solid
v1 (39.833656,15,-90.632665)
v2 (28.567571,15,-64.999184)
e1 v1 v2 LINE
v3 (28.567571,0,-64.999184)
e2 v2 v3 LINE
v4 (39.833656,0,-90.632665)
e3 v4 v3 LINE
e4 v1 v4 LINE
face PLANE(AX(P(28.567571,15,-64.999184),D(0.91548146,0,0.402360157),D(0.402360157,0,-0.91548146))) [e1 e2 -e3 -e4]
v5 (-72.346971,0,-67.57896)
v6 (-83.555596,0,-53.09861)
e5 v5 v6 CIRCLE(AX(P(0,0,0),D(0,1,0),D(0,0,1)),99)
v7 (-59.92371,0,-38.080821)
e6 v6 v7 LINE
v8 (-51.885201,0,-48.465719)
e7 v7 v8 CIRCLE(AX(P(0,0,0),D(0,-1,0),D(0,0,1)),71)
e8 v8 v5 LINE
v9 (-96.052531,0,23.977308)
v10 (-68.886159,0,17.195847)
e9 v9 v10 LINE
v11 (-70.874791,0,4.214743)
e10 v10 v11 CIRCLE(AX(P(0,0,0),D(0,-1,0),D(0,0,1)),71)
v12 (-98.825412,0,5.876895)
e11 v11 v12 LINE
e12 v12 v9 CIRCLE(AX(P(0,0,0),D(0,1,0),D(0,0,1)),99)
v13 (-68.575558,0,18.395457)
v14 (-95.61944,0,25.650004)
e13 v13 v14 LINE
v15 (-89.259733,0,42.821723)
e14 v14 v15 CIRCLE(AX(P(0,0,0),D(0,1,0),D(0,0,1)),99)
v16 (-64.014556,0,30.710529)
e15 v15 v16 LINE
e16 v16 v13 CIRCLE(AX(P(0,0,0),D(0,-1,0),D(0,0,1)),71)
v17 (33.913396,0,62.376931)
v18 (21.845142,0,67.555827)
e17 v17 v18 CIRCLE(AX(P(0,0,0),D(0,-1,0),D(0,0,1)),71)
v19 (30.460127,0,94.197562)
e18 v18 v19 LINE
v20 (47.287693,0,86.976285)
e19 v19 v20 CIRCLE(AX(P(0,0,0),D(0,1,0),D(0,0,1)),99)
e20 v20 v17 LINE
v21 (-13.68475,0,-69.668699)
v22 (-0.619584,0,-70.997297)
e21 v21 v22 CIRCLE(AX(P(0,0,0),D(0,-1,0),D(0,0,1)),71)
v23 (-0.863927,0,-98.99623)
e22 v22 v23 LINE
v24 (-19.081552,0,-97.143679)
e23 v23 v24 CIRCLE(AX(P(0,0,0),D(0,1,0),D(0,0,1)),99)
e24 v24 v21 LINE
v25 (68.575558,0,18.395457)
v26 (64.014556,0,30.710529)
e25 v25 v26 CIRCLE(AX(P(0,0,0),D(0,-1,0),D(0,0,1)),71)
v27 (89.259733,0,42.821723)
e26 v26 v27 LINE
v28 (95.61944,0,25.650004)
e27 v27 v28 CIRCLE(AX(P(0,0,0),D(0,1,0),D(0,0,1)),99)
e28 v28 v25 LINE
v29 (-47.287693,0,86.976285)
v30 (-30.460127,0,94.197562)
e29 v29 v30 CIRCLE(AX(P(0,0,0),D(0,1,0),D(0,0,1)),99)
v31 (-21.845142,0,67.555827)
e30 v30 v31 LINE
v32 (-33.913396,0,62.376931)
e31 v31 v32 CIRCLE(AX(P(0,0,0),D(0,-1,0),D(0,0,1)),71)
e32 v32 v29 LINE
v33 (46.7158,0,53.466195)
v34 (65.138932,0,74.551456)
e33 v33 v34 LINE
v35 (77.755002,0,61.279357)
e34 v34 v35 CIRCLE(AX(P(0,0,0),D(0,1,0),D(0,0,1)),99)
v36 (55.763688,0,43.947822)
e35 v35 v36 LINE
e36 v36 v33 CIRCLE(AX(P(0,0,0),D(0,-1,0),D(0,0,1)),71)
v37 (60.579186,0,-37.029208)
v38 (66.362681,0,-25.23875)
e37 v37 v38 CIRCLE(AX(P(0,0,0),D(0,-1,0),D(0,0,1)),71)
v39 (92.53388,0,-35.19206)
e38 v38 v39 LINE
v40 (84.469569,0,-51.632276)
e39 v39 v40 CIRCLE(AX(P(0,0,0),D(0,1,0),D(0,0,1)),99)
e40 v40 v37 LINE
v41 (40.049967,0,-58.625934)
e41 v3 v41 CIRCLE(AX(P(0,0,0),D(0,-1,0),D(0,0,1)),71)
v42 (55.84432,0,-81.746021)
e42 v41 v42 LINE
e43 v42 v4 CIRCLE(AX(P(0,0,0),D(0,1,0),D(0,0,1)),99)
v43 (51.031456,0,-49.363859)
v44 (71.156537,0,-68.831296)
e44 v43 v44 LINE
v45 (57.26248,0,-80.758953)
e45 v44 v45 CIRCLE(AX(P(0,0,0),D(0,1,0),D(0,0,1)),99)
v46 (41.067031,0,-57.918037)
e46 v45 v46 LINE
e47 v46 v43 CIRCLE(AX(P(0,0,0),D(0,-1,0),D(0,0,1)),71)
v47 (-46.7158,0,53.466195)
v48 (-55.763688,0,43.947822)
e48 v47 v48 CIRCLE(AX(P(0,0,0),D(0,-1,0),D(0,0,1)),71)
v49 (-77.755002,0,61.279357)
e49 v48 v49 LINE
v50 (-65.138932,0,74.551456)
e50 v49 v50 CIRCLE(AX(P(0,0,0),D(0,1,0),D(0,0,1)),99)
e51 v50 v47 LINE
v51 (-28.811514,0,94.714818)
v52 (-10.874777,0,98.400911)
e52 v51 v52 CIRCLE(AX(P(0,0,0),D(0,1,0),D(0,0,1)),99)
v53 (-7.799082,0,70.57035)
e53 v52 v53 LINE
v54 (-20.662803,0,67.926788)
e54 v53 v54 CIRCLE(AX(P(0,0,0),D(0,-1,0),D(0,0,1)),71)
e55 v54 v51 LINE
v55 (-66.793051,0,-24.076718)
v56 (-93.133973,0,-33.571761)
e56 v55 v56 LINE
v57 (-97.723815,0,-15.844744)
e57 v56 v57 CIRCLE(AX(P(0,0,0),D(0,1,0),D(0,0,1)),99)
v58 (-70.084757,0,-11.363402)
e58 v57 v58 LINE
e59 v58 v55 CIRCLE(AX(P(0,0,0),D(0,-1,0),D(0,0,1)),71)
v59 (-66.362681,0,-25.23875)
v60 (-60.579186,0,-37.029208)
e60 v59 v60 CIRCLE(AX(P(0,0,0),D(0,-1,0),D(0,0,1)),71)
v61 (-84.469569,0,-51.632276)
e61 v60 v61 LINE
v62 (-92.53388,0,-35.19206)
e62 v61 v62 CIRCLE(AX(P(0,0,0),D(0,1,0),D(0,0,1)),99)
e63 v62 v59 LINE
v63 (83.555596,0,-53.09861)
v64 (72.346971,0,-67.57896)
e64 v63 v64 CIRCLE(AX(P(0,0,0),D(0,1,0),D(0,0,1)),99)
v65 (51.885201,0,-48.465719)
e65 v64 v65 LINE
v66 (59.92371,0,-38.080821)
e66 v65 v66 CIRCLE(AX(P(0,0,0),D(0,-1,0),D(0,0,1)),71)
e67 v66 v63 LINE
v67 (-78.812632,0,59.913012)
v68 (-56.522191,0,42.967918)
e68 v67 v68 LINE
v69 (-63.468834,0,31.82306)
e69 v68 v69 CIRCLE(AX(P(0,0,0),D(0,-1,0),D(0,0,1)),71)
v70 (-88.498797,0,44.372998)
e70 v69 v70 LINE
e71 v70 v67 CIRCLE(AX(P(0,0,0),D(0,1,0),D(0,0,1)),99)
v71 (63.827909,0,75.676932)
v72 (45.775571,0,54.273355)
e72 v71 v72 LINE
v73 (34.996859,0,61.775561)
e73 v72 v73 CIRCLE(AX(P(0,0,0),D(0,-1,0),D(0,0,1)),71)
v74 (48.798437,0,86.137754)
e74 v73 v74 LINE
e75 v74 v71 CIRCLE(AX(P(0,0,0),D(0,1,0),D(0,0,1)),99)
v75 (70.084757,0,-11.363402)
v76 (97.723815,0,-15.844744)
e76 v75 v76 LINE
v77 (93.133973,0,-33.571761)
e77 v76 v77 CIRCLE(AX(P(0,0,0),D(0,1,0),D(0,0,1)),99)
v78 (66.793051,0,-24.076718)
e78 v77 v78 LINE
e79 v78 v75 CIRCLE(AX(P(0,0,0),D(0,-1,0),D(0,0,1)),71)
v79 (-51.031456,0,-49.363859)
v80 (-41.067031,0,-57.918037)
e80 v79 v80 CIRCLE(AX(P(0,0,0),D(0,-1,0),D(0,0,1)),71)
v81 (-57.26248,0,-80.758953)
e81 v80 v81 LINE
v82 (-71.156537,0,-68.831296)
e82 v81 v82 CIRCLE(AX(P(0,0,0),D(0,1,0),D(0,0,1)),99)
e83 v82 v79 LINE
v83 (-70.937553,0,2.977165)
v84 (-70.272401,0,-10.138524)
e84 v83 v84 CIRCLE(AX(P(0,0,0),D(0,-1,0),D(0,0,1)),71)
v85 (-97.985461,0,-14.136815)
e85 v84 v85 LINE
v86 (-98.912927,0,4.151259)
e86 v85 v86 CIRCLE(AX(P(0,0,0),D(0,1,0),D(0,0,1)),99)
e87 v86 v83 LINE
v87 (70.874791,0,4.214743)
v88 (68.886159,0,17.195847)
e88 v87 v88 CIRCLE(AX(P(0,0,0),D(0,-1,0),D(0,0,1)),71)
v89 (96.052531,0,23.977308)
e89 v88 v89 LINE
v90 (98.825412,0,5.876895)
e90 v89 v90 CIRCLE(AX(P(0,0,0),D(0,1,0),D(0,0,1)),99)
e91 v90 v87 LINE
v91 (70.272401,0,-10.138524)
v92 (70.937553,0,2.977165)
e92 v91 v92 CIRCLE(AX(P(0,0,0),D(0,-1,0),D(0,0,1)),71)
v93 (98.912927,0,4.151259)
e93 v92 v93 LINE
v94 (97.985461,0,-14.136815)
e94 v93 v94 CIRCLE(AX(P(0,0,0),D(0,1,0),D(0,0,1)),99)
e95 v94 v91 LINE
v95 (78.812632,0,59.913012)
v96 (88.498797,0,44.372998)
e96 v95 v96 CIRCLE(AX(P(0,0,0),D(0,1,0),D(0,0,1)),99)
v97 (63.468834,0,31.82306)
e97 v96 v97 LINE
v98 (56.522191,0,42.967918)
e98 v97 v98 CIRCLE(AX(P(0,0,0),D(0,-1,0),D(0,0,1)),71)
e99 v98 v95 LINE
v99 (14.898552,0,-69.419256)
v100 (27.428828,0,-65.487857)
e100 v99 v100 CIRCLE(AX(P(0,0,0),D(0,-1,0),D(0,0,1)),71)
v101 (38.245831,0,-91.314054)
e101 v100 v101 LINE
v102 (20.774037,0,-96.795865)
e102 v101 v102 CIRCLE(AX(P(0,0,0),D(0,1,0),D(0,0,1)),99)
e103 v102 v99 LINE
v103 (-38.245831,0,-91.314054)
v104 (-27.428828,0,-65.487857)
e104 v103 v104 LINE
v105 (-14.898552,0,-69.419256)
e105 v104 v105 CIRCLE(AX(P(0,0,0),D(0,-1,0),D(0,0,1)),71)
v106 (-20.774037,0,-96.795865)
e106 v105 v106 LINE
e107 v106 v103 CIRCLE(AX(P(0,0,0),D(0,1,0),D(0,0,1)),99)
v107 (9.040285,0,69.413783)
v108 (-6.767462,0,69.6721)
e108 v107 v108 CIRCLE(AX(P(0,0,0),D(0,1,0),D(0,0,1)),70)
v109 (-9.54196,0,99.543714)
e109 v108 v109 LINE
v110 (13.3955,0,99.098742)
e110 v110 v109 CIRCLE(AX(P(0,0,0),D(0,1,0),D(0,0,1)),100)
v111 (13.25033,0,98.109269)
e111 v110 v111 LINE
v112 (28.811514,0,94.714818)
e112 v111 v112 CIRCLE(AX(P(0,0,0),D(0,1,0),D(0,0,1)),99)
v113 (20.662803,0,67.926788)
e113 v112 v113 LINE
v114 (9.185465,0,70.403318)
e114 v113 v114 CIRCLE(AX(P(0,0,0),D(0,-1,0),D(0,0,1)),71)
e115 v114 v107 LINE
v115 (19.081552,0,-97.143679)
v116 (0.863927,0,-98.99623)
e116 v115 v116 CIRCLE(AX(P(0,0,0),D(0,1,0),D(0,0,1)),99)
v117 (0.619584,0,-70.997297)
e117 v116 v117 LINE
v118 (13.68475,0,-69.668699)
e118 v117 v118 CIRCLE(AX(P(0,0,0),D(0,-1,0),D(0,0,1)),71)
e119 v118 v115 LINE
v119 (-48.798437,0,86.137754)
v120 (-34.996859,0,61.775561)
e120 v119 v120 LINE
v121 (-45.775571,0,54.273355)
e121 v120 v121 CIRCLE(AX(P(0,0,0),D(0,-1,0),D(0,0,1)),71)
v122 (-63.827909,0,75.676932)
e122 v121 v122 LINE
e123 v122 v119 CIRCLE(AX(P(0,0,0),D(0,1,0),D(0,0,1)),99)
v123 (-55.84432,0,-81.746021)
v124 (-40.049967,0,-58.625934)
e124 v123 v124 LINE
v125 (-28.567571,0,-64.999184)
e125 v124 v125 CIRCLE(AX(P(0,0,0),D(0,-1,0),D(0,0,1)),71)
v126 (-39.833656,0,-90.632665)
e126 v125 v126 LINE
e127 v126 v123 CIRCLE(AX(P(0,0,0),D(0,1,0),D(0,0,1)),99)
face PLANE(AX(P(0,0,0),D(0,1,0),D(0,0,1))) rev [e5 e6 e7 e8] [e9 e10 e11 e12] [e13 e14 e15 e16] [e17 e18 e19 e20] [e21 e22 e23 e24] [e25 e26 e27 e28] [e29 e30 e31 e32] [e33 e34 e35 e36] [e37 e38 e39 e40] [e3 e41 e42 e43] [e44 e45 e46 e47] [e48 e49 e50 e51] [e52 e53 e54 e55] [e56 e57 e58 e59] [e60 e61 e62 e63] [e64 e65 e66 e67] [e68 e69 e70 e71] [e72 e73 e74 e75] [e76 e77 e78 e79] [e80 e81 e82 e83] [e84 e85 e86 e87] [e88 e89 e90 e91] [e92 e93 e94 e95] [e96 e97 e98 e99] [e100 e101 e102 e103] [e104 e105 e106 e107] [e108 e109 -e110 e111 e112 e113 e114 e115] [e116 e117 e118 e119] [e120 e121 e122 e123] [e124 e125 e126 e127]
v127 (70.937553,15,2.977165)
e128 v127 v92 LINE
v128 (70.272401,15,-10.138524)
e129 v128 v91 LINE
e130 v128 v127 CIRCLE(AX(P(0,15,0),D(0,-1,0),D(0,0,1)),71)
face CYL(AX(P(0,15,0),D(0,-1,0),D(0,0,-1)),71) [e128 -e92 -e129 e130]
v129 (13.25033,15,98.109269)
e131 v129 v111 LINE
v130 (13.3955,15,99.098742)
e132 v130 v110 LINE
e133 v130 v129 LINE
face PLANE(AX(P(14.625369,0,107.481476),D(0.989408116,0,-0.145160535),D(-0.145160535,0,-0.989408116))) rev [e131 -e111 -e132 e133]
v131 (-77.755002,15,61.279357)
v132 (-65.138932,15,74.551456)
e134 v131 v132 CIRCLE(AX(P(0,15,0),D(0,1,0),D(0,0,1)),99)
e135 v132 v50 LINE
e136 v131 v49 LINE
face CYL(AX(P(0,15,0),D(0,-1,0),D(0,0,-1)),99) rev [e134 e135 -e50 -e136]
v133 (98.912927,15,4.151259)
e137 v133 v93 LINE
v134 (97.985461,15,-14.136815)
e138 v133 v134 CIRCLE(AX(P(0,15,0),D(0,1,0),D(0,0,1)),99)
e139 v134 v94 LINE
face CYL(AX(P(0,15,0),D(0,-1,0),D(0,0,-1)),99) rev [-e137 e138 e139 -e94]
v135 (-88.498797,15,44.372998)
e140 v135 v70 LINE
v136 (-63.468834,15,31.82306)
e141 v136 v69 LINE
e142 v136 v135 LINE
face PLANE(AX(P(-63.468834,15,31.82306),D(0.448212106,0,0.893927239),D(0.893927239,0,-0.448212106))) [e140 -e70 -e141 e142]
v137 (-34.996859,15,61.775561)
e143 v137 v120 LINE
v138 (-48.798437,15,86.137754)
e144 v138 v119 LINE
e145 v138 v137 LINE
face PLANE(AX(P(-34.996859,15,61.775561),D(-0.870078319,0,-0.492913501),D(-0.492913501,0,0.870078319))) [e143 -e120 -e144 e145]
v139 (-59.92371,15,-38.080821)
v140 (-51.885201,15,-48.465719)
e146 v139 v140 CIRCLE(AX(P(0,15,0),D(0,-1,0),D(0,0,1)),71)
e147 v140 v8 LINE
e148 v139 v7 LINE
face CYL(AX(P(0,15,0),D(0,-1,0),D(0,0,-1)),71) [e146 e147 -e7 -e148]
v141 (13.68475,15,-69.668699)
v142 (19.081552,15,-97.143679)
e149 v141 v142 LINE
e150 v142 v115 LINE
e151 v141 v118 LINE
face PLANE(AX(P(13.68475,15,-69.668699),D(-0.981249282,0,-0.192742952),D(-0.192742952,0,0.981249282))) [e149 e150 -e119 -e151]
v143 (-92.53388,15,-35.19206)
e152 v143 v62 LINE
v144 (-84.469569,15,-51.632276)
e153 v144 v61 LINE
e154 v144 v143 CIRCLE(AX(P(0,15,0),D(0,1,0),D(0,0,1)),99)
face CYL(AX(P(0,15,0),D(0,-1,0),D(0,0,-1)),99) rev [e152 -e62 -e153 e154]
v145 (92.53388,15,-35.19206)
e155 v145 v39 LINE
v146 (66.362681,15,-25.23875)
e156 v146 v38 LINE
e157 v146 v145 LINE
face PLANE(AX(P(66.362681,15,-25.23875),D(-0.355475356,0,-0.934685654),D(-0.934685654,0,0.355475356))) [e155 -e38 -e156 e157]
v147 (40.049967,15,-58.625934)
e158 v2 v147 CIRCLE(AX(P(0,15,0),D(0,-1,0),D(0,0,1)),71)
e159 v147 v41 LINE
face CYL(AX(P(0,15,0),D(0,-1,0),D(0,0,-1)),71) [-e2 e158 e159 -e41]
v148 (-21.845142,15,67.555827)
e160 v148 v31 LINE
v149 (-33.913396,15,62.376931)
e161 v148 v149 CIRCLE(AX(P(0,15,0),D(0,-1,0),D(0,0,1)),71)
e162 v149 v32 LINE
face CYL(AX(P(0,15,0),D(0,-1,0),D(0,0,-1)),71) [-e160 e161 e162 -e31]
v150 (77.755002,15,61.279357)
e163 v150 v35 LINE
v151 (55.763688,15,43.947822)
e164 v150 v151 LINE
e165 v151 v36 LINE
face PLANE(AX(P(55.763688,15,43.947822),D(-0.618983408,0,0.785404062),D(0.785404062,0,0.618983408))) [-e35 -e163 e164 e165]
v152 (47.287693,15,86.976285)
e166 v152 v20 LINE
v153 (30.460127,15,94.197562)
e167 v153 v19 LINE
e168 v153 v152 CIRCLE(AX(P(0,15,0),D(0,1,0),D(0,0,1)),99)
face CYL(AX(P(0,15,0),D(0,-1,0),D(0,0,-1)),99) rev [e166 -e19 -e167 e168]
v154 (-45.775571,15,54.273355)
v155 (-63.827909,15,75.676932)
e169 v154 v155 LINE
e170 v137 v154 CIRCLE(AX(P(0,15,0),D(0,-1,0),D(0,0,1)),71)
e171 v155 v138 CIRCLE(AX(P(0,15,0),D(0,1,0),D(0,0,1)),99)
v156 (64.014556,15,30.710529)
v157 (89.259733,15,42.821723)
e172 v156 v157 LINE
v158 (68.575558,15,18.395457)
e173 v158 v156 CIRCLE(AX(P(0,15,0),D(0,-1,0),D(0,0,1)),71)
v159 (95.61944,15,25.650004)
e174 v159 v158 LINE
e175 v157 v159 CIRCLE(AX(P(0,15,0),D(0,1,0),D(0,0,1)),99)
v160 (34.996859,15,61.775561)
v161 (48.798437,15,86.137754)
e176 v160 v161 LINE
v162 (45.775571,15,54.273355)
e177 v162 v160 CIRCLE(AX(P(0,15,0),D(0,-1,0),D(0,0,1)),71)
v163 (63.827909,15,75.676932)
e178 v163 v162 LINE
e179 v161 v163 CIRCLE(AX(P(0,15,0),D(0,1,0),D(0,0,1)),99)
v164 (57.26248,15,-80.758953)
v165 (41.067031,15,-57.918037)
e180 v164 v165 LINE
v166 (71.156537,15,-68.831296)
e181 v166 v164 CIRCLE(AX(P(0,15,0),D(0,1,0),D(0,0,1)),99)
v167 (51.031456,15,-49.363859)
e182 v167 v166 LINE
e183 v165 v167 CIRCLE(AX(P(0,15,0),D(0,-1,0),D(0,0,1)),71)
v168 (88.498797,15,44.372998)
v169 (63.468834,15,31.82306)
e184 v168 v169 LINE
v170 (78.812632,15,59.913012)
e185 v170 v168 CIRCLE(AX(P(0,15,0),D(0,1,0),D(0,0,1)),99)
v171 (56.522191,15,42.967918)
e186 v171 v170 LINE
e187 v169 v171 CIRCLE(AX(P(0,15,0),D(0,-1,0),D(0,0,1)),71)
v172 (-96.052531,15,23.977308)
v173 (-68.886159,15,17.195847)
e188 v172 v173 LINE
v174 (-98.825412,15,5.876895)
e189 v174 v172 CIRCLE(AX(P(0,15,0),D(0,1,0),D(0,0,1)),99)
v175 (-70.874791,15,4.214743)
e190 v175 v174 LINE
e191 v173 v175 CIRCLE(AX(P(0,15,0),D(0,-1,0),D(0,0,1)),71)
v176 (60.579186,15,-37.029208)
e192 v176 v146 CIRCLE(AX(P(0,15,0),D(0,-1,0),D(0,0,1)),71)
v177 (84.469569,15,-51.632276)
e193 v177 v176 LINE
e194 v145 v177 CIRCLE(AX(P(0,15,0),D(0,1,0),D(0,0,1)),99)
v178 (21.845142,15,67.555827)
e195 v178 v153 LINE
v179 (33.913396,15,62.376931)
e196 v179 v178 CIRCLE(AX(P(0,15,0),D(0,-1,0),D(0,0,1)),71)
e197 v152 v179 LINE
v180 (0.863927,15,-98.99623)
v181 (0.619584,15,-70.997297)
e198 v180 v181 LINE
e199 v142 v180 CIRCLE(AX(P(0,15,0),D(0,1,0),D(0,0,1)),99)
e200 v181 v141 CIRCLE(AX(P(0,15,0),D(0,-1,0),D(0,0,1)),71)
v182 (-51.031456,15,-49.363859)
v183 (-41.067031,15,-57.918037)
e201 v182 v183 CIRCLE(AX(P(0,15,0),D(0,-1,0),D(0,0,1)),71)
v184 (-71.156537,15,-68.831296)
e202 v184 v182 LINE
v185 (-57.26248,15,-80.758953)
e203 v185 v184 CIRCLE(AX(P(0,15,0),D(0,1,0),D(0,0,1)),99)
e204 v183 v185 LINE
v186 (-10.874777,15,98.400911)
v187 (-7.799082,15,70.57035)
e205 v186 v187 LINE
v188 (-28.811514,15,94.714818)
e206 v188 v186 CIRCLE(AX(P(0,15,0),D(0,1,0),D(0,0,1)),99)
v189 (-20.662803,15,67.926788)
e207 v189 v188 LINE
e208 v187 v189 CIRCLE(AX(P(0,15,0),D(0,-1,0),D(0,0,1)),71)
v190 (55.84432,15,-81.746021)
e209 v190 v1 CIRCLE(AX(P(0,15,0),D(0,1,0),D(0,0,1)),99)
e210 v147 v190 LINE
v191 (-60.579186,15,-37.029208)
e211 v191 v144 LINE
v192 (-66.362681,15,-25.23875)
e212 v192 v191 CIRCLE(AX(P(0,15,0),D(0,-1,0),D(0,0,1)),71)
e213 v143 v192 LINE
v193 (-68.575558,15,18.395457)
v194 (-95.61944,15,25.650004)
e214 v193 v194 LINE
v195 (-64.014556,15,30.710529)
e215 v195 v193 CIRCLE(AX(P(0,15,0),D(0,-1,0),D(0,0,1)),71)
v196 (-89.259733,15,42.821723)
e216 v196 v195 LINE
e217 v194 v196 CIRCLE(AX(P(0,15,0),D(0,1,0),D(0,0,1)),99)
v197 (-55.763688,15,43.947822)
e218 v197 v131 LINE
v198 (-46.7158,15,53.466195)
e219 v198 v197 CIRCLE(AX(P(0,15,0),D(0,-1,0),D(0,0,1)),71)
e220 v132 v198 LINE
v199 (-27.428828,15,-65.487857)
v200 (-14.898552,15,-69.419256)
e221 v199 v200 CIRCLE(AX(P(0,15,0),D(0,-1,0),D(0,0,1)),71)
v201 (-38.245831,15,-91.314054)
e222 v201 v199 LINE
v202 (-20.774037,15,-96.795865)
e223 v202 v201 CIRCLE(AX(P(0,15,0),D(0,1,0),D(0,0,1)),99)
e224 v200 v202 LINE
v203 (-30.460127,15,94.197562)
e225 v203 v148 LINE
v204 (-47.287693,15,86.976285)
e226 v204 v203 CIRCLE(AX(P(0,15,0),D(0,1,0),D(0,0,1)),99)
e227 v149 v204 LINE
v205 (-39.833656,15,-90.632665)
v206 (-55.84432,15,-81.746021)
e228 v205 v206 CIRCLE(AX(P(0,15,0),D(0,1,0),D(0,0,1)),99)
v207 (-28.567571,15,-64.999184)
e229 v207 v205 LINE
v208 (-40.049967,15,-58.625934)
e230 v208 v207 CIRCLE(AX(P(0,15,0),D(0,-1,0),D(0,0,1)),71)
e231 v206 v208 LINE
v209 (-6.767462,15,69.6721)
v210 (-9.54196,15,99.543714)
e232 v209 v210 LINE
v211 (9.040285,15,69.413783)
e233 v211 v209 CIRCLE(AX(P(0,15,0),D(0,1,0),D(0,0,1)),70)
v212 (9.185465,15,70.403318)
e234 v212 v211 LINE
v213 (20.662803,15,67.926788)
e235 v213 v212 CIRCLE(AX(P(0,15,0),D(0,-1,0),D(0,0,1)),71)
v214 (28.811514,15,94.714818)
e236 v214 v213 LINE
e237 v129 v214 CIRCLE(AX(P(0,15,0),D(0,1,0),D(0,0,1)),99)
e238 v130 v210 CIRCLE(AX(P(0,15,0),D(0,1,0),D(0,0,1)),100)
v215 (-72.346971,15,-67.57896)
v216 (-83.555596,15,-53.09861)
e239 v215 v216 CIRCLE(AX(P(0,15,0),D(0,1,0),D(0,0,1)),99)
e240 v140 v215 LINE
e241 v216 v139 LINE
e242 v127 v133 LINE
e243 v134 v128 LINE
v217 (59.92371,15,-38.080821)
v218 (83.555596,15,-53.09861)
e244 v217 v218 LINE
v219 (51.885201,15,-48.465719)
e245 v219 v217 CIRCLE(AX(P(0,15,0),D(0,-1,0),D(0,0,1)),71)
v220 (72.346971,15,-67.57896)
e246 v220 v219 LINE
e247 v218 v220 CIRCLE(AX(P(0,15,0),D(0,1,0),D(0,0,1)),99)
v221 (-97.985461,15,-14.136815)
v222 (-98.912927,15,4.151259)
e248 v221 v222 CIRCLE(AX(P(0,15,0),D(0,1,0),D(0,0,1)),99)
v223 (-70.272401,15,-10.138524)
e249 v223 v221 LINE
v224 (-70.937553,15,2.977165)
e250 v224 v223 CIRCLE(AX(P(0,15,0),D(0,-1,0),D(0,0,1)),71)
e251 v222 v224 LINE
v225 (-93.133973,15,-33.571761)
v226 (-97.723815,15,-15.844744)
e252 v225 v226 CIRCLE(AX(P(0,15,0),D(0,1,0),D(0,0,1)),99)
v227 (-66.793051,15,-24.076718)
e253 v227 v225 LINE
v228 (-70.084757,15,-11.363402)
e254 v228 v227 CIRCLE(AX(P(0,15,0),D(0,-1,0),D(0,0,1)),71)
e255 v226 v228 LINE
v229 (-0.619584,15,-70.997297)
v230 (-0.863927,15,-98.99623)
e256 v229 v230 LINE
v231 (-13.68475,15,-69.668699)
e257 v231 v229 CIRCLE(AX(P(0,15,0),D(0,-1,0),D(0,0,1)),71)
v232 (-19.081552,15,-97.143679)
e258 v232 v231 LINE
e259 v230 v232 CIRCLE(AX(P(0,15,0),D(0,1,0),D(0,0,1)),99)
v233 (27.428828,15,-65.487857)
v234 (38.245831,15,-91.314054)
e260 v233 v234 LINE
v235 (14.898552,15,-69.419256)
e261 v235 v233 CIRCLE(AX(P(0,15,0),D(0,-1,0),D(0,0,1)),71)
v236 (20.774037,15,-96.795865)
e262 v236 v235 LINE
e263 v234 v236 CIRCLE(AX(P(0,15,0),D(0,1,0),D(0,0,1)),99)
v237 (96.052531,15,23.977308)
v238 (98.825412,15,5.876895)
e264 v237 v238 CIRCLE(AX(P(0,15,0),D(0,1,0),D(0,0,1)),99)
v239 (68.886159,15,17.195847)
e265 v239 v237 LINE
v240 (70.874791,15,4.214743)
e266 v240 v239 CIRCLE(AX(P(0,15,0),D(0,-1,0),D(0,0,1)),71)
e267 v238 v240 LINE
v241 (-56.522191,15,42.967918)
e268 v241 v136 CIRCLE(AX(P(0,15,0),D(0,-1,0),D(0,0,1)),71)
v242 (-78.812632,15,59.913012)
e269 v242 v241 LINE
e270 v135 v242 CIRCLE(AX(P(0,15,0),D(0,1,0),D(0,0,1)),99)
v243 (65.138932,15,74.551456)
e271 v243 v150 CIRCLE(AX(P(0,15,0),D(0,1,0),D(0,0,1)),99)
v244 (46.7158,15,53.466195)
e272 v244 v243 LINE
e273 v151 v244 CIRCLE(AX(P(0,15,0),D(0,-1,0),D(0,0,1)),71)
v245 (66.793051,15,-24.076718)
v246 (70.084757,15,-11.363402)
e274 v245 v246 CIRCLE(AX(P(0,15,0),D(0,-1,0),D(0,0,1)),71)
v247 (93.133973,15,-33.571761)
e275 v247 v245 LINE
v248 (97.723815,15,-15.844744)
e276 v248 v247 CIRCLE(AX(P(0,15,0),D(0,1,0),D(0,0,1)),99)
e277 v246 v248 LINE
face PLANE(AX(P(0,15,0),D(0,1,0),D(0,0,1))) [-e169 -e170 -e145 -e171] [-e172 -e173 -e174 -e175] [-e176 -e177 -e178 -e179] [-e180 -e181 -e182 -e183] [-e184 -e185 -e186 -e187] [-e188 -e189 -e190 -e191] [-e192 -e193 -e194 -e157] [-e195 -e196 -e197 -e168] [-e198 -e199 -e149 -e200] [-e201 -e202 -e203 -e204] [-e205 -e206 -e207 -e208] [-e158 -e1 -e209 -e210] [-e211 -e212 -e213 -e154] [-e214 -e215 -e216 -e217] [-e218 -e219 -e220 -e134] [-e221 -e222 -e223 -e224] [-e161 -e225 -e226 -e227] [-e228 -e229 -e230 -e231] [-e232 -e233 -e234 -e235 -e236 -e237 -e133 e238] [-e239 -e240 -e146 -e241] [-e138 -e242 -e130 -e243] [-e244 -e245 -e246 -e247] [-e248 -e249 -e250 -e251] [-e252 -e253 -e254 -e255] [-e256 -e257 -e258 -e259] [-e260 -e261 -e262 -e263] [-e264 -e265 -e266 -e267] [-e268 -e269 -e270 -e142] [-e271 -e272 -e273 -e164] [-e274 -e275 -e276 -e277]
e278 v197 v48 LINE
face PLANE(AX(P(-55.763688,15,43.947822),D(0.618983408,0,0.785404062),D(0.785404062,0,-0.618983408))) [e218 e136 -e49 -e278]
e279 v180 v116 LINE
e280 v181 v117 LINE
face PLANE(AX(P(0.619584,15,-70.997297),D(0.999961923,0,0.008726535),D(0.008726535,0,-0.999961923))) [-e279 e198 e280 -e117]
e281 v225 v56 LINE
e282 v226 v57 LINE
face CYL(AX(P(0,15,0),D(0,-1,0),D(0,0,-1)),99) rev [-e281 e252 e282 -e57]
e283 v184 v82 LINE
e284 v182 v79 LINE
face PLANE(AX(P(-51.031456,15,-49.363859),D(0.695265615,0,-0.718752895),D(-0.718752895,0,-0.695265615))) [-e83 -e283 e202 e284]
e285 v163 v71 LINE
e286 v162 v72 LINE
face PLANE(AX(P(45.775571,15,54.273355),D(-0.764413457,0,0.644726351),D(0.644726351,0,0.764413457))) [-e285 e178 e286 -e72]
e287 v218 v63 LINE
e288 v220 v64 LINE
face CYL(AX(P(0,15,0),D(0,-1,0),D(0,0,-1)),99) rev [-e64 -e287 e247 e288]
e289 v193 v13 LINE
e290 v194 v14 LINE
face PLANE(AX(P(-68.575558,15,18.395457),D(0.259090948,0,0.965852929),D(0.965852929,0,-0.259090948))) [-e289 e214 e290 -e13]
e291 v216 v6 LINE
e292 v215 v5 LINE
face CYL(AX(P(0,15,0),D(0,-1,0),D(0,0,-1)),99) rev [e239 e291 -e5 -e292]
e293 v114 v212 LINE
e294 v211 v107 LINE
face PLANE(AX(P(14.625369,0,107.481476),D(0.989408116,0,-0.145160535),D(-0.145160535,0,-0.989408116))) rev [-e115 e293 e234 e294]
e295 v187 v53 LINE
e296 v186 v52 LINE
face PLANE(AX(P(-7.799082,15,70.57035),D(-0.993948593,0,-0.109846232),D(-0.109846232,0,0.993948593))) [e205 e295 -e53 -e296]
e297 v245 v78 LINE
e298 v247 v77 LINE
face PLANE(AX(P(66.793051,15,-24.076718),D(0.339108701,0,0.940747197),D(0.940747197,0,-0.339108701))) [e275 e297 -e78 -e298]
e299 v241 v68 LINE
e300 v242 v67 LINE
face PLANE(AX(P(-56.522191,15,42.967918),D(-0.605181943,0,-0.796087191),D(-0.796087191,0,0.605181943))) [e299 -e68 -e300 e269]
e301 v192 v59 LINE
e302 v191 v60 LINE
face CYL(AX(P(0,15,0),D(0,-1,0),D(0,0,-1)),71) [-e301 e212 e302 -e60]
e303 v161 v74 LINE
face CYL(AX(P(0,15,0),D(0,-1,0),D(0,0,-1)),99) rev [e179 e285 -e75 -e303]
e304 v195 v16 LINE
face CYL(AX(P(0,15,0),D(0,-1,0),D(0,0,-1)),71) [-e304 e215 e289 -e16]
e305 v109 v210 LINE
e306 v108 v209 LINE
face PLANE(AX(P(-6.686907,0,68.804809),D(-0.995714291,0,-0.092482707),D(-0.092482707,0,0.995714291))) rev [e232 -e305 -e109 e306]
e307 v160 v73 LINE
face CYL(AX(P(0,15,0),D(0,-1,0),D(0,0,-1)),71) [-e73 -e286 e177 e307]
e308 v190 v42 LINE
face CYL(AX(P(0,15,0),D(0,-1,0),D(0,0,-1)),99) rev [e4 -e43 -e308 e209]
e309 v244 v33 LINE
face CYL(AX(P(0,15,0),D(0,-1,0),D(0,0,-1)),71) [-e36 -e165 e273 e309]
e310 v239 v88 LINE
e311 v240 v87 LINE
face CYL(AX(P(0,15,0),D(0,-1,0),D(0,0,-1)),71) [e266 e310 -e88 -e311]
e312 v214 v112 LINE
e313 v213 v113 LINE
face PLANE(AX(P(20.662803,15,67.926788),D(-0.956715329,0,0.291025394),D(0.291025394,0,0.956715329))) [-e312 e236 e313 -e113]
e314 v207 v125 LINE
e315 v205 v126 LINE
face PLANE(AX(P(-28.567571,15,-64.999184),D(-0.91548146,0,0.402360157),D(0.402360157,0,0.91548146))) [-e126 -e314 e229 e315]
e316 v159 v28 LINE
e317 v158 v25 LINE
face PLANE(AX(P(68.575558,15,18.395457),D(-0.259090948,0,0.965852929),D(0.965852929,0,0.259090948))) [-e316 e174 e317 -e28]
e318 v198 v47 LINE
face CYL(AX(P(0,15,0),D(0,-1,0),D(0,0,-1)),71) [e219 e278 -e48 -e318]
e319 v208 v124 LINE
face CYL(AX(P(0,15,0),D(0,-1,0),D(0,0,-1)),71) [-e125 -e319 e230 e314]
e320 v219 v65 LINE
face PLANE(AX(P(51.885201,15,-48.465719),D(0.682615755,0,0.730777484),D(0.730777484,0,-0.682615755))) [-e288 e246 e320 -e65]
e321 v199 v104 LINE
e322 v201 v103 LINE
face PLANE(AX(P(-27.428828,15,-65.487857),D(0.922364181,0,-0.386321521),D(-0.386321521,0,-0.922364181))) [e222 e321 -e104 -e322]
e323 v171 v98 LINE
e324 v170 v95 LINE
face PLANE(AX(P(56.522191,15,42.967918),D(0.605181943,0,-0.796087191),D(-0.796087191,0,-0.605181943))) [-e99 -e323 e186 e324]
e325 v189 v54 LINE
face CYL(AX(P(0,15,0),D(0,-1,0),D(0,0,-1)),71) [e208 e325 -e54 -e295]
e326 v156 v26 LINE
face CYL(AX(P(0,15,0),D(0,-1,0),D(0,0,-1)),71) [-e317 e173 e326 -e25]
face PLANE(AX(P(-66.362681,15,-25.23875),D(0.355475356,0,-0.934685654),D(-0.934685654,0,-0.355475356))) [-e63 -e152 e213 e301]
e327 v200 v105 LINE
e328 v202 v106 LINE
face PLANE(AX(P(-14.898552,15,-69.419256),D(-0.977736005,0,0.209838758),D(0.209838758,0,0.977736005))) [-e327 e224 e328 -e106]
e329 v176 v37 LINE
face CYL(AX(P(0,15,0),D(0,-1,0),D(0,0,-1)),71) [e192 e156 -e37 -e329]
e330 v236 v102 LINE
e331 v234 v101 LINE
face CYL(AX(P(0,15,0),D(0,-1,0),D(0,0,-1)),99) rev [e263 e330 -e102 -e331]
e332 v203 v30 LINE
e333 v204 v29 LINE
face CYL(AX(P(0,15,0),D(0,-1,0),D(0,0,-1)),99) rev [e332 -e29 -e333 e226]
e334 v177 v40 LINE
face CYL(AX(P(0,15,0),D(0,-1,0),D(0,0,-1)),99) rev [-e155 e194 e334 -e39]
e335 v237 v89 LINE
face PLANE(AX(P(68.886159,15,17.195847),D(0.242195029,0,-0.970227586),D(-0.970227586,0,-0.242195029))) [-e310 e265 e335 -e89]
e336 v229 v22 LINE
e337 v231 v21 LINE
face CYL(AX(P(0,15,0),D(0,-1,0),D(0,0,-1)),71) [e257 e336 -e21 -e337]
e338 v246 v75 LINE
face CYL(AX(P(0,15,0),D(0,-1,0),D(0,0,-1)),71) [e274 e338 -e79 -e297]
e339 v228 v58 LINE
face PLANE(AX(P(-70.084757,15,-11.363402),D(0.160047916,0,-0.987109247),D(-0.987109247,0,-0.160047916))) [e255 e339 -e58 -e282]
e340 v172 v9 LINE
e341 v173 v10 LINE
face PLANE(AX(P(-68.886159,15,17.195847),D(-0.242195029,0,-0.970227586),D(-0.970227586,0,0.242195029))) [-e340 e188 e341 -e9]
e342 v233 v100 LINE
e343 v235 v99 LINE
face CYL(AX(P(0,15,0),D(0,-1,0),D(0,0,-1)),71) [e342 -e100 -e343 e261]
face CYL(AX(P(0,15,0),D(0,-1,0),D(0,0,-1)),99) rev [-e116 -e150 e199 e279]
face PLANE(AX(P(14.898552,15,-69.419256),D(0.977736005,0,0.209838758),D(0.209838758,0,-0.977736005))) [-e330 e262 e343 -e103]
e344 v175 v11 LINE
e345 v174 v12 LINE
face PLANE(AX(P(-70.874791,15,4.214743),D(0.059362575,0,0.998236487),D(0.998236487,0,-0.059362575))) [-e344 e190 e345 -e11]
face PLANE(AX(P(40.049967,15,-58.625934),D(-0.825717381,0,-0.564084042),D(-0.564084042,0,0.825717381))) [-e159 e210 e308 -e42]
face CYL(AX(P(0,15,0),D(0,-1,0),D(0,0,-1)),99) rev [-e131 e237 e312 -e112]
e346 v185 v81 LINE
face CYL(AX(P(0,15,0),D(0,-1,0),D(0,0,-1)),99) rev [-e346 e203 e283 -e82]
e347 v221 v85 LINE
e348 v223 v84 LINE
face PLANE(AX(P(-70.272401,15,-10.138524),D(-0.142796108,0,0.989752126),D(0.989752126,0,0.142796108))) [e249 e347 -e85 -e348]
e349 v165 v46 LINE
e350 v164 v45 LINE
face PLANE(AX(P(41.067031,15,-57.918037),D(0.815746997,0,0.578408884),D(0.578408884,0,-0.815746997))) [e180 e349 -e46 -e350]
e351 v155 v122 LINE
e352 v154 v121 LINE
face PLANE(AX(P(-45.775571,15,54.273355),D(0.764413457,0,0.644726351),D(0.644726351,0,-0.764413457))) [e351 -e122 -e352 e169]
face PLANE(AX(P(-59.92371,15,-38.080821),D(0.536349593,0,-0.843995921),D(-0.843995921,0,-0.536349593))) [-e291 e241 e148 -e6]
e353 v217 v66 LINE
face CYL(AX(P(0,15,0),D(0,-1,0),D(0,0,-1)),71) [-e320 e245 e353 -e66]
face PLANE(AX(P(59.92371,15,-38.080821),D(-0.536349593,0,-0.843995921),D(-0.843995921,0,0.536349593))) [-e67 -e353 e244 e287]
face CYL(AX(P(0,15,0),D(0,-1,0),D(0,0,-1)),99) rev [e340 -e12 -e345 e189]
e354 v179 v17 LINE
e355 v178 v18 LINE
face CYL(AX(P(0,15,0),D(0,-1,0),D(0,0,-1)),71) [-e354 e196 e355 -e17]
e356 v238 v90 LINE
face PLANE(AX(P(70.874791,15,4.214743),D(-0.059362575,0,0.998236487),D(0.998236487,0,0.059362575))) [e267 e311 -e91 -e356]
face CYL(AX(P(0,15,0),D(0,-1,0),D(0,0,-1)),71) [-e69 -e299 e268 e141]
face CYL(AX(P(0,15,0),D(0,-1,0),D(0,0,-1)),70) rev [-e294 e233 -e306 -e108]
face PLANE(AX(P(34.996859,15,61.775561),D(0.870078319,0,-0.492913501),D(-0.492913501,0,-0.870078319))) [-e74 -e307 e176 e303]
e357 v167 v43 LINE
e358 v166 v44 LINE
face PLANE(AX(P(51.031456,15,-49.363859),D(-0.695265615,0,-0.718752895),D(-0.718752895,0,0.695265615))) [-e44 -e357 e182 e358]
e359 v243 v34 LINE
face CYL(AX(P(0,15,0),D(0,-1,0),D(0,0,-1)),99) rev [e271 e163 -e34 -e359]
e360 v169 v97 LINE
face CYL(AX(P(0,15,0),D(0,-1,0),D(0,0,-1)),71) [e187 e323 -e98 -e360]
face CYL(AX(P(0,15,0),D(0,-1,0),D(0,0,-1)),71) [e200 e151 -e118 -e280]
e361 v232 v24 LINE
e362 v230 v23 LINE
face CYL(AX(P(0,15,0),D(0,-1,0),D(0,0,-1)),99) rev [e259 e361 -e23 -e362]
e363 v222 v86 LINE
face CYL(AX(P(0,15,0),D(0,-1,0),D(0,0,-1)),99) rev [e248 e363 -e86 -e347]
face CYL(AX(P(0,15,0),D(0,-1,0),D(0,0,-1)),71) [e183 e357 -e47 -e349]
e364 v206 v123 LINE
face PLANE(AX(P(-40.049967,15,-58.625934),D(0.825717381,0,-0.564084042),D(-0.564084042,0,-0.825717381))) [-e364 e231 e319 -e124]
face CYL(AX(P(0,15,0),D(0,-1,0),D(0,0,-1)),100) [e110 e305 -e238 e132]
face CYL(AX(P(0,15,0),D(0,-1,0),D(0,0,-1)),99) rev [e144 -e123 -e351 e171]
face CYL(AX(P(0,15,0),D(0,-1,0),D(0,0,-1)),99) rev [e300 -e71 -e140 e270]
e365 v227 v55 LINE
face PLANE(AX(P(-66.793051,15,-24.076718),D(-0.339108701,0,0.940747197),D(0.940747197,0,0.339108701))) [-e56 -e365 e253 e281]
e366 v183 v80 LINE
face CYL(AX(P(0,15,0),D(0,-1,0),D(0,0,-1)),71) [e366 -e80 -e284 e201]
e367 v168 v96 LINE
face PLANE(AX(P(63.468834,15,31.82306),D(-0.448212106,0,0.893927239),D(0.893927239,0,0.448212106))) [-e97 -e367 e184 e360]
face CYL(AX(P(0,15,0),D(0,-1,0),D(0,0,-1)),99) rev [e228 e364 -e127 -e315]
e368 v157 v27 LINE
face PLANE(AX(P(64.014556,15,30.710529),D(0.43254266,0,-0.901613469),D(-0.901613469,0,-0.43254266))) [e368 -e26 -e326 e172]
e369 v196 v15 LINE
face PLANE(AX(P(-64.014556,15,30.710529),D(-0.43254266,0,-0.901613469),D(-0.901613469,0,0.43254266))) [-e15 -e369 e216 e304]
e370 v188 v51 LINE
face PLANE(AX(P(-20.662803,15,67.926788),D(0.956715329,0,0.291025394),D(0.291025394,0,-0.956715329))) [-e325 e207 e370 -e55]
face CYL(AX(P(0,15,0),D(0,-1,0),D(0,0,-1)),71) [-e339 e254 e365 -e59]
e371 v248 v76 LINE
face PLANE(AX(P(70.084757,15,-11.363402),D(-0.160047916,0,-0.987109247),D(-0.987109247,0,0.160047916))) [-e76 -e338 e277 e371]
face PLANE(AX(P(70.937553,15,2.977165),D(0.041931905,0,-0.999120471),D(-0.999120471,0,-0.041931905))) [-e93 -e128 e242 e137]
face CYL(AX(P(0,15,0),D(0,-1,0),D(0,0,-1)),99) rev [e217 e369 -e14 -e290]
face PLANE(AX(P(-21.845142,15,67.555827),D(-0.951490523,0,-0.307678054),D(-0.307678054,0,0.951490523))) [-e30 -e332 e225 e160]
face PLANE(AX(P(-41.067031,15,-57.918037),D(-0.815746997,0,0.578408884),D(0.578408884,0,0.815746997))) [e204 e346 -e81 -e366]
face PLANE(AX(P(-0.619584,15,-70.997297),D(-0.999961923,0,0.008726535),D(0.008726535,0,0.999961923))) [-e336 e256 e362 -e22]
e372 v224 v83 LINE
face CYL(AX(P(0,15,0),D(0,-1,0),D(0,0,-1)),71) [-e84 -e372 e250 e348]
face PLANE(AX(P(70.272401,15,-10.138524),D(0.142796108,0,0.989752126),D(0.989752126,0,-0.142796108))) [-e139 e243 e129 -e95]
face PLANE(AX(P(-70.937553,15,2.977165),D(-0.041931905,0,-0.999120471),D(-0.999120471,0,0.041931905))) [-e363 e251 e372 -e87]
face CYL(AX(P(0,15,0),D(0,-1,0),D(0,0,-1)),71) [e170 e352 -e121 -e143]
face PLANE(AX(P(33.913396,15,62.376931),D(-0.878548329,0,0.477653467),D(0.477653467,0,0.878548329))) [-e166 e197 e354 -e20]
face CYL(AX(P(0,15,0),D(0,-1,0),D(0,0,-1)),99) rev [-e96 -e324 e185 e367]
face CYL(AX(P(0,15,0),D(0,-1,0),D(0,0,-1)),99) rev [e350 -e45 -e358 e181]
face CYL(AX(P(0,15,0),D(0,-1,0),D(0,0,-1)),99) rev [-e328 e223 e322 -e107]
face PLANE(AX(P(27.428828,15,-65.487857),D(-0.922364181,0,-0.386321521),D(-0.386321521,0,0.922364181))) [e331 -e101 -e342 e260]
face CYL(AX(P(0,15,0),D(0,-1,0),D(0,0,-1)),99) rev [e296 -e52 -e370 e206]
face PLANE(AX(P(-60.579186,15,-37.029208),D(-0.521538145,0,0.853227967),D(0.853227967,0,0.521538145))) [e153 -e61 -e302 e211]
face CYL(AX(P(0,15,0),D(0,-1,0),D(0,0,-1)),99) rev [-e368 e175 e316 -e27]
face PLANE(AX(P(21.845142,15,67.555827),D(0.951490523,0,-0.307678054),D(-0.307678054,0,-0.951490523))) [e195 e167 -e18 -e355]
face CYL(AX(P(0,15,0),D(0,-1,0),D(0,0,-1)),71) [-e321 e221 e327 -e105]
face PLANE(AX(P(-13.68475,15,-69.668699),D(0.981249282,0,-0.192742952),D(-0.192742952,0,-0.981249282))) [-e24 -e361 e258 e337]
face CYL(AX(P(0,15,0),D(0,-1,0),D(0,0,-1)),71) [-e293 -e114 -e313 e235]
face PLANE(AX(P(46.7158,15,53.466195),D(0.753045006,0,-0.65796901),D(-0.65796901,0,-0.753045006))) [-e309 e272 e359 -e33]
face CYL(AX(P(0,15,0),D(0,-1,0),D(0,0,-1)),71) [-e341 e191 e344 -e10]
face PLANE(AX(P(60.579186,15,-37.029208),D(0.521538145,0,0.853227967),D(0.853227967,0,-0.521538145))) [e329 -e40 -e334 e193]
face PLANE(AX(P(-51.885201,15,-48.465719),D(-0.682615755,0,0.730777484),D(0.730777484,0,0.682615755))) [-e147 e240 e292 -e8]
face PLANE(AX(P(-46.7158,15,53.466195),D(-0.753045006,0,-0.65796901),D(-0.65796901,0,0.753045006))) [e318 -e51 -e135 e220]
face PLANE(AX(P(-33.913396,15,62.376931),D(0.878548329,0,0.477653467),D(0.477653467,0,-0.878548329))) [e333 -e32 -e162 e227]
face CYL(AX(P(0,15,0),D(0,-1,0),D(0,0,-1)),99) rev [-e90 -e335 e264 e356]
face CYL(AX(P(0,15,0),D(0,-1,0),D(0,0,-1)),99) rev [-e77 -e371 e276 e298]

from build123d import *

# Parameters (mm, degrees)
RESSALTO_EXTRUS_O1_OUTLINE_R   = 100
RESSALTO_EXTRUS_O1_OUTLINE_R_2 = 70
RESSALTO_EXTRUS_O1_DEPTH       = 15
CORTE_EXTRUS_O1_DEPTH          = 143.214626533


# Read off the part's stored shape, not the designer's step: Ressalto-extrusão1
with BuildPart() as part:
    # Ressalto-extrusão1 outline → Ressalto-extrusão1 (new body)
    with BuildSketch(Plane(origin=(0, 0, 0), x_dir=(1, 0, 0), z_dir=(0, 1, 0))):
        Circle(RESSALTO_EXTRUS_O1_OUTLINE_R)
        with BuildLine():
            Line((-46.71579972, -53.466195456), (-65.138932004, -74.551455635))
            ThreePointArc((-65.138932004, -74.551455635), (-71.754485936, -68.207724989), (-77.755002141, -61.279357389))
            Line((-77.755002141, -61.279357389), (-55.763688404, -43.947821966))
            ThreePointArc((-55.763688404, -43.947821966), (-51.460287893, -48.916651255), (-46.71579972, -53.466195456))
        make_face(mode=Mode.SUBTRACT)
        with BuildLine():
            Line((-21.845141851, -67.555827117), (-30.460127369, -94.197561755))
            ThreePointArc((-30.460127369, -94.197561755), (-39.041229656, -90.97682335), (-47.287693227, -86.976284522))
            Line((-47.287693227, -86.976284522), (-33.913396152, -62.376931324))
            ThreePointArc((-33.913396152, -62.376931324), (-27.999265713, -65.246004625), (-21.845141851, -67.555827117))
        make_face(mode=Mode.SUBTRACT)
        with BuildLine():
            Line((-7.799082491, -70.570350093), (-10.874776995, -98.400910693))
            ThreePointArc((-10.874776995, -98.400910693), (-19.928553489, -96.973464184), (-28.811514011, -94.714817533))
            Line((-28.811514011, -94.714817533), (-20.662802978, -67.926788332))
            ThreePointArc((-20.662802978, -67.926788332), (-14.292194926, -69.546625829), (-7.799082491, -70.570350093))
        make_face(mode=Mode.SUBTRACT)
        with BuildLine():
            Line((-34.996858536, -61.775560642), (-48.79843655, -86.137753571))
            ThreePointArc((-48.79843655, -86.137753571), (-56.555553294, -81.25558068), (-63.827908725, -75.676932204))
            Line((-63.827908725, -75.676932204), (-45.775570904, -54.273355419))
            ThreePointArc((-45.775570904, -54.273355419), (-40.560043272, -58.274204326), (-34.996858536, -61.775560642))
        make_face(mode=Mode.SUBTRACT)
        with BuildLine():
            Line((-64.014556308, -30.710528825), (-89.259733443, -42.821723292))
            ThreePointArc((-89.259733443, -42.821723292), (-92.837461083, -34.383220032), (-95.619439994, -25.650003805))
            Line((-95.619439994, -25.650003805), (-68.575557976, -18.395457274))
            ThreePointArc((-68.575557976, -18.395457274), (-66.580401382, -24.658672952), (-64.014556308, -30.710528825))
        make_face(mode=Mode.SUBTRACT)
        with BuildLine():
            Line((-56.522190576, -42.967917945), (-78.812631929, -59.913012346))
            ThreePointArc((-78.812631929, -59.913012346), (-84.015781492, -52.367437022), (-88.498796634, -44.372998482))
            Line((-88.498796634, -44.372998482), (-63.46883395, -31.823059518))
            ThreePointArc((-63.46883395, -31.823059518), (-60.253742282, -37.556444733), (-56.522190576, -42.967917945))
        make_face(mode=Mode.SUBTRACT)
        with BuildLine():
            Line((-68.886158583, -17.195847047), (-96.052530982, -23.977307855))
            ThreePointArc((-96.052530982, -23.977307855), (-97.858364108, -14.991349973), (-98.825412246, -5.876894957))
            Line((-98.825412246, -5.876894957), (-70.874790601, -4.214742848))
            ThreePointArc((-70.874790601, -4.214742848), (-70.181251027, -10.751372203), (-68.886158583, -17.195847047))
        make_face(mode=Mode.SUBTRACT)
        with BuildLine():
            Line((6.566272221, -70.695714645), (9.155788027, -98.575714786))
            ThreePointArc((9.155788027, -98.575714786), (0, -99), (-9.155788027, -98.575714786))
            Line((-9.155788027, -98.575714786), (-6.566272221, -70.695714645))
            ThreePointArc((-6.566272221, -70.695714645), (0, -71), (6.566272221, -70.695714645))
        make_face(mode=Mode.SUBTRACT)
        with BuildLine():
            Line((20.662802978, -67.926788332), (28.811514011, -94.714817533))
            ThreePointArc((28.811514011, -94.714817533), (19.928553489, -96.973464184), (10.874776995, -98.400910693))
            Line((10.874776995, -98.400910693), (7.799082492, -70.570350093))
            ThreePointArc((7.799082492, -70.570350093), (14.292194927, -69.546625829), (20.662802978, -67.926788332))
        make_face(mode=Mode.SUBTRACT)
        with BuildLine():
            Line((33.913396152, -62.376931324), (47.287693227, -86.976284522))
            ThreePointArc((47.287693227, -86.976284522), (39.041229656, -90.97682335), (30.460127369, -94.197561755))
            Line((30.460127369, -94.197561755), (21.845141851, -67.555827117))
            ThreePointArc((21.845141851, -67.555827117), (27.999265713, -65.246004625), (33.913396152, -62.376931324))
        make_face(mode=Mode.SUBTRACT)
        with BuildLine():
            Line((45.775570904, -54.273355419), (63.827908725, -75.676932204))
            ThreePointArc((63.827908725, -75.676932204), (56.555553294, -81.255580679), (48.79843655, -86.137753571))
            Line((48.79843655, -86.137753571), (34.996858536, -61.775560642))
            ThreePointArc((34.996858536, -61.775560642), (40.560043272, -58.274204326), (45.775570904, -54.273355419))
        make_face(mode=Mode.SUBTRACT)
        with BuildLine():
            Line((55.763688405, -43.947821966), (77.755002142, -61.279357389))
            ThreePointArc((77.755002142, -61.279357389), (71.754485936, -68.207724988), (65.138932005, -74.551455635))
            Line((65.138932005, -74.551455635), (46.71579972, -53.466195455))
            ThreePointArc((46.71579972, -53.466195455), (51.460287893, -48.916651254), (55.763688405, -43.947821966))
        make_face(mode=Mode.SUBTRACT)
        with BuildLine():
            Line((63.46883395, -31.823059518), (88.498796634, -44.372998482))
            ThreePointArc((88.498796634, -44.372998482), (84.015781492, -52.367437022), (78.812631929, -59.913012346))
            Line((78.812631929, -59.913012346), (56.522190576, -42.967917945))
            ThreePointArc((56.522190576, -42.967917945), (60.253742282, -37.556444733), (63.46883395, -31.823059518))
        make_face(mode=Mode.SUBTRACT)
        with BuildLine():
            Line((68.575557976, -18.395457274), (95.619439994, -25.650003805))
            ThreePointArc((95.619439994, -25.650003805), (92.837461083, -34.383220032), (89.259733443, -42.821723292))
            Line((89.259733443, -42.821723292), (64.014556308, -30.710528825))
            ThreePointArc((64.014556308, -30.710528825), (66.580401382, -24.658672952), (68.575557976, -18.395457274))
        make_face(mode=Mode.SUBTRACT)
        with BuildLine():
            Line((70.874790601, -4.214742848), (98.825412246, -5.876894957))
            ThreePointArc((98.825412246, -5.876894957), (97.858364108, -14.991349973), (96.052530982, -23.977307855))
            Line((96.052530982, -23.977307855), (68.886158583, -17.195847047))
            ThreePointArc((68.886158583, -17.195847047), (70.181251027, -10.751372203), (70.874790601, -4.214742848))
        make_face(mode=Mode.SUBTRACT)
        with BuildLine():
            Line((-70.937553432, -2.977165271), (-98.912926617, -4.151258617))
            ThreePointArc((-98.912926617, -4.151258617), (-98.87293421, 5.014267715), (-97.98546051, 14.13681466))
            Line((-97.98546051, 14.13681466), (-70.272400971, 10.138523645))
            ThreePointArc((-70.272400971, 10.138523645), (-70.908872009, 3.596090987), (-70.937553432, -2.977165271))
        make_face(mode=Mode.SUBTRACT)
        with BuildLine():
            Line((-70.084756509, 11.363402002), (-97.723815414, 15.844743636))
            ThreePointArc((-97.723815414, 15.844743636), (-95.839634768, 24.814600693), (-93.133972507, 33.571761424))
            Line((-93.133972507, 33.571761424), (-66.79305099, 24.076717789))
            ThreePointArc((-66.79305099, 24.076717789), (-68.73347544, 17.79632979), (-70.084756509, 11.363402002))
        make_face(mode=Mode.SUBTRACT)
        with BuildLine():
            Line((-66.36268142, 25.238750261), (-92.533879726, 35.192060224))
            ThreePointArc((-92.533879726, 35.192060224), (-88.882649418, 43.599021004), (-84.469568727, 51.632276331))
            Line((-84.469568727, 51.632276331), (-60.579185652, 37.029208278))
            ThreePointArc((-60.579185652, 37.029208278), (-63.74412231, 31.267984761), (-66.36268142, 25.238750261))
        make_face(mode=Mode.SUBTRACT)
        with BuildLine():
            Line((-59.923710356, 38.08082112), (-83.55559613, 53.09860973))
            ThreePointArc((-83.55559613, 53.09860973), (-78.286797957, 60.598492272), (-72.346970878, 67.578959779))
            Line((-72.346970878, 67.578959779), (-51.885201337, 48.465718629))
            ThreePointArc((-51.885201337, 48.465718629), (-56.145077323, 43.459524761), (-59.923710356, 38.08082112))
        make_face(mode=Mode.SUBTRACT)
        with BuildLine():
            ThreePointArc((-41.067030782, 57.918036765), (-46.247446273, 53.871826711), (-51.03145555, 49.363858687))
            Line((-51.03145555, 49.363858687), (-71.156536611, 68.831295916))
            ThreePointArc((-71.156536611, 68.831295916), (-64.48587579, 75.117054147), (-57.262479541, 80.758952673))
            Line((-57.262479541, 80.758952673), (-41.067030782, 57.918036765))
        make_face(mode=Mode.SUBTRACT)
        with BuildLine():
            ThreePointArc((-28.567571162, 64.999183671), (-34.45643934, 62.078609746), (-40.049966957, 58.62593408))
            Line((-40.049966957, 58.62593408), (-55.844320123, 81.746020759))
            ThreePointArc((-55.844320123, 81.746020759), (-48.044894291, 86.560314998), (-39.833655564, 90.632664555))
            Line((-39.833655564, 90.632664555), (-28.567571162, 64.999183671))
        make_face(mode=Mode.SUBTRACT)
        with BuildLine():
            ThreePointArc((-14.898551822, 69.41925636), (-21.254781731, 67.743887204), (-27.428828011, 65.487856843))
            Line((-27.428828011, 65.487856843), (-38.245830607, 91.314053908))
            ThreePointArc((-38.245830607, 91.314053908), (-29.636949174, 94.459786384), (-20.774037048, 96.795864502))
            Line((-20.774037048, 96.795864502), (-14.898551822, 69.41925636))
        make_face(mode=Mode.SUBTRACT)
        with BuildLine():
            Line((-13.684749624, 69.668699053), (-19.081552293, 97.143678961))
            ThreePointArc((-19.081552293, 97.143678961), (-10.015663877, 98.492063016), (-0.863927014, 98.996230383))
            Line((-0.863927014, 98.996230383), (-0.61958402, 70.997296538))
            ThreePointArc((-0.61958402, 70.997296538), (-7.182950861, 70.635721961), (-13.684749624, 69.668699053))
        make_face(mode=Mode.SUBTRACT)
        Circle(RESSALTO_EXTRUS_O1_OUTLINE_R_2, mode=Mode.SUBTRACT)
        with BuildLine():
            Line((70.272400971, 10.138523645), (97.98546051, 14.13681466))
            ThreePointArc((97.98546051, 14.13681466), (98.87293421, 5.014267715), (98.912926617, -4.151258617))
            Line((98.912926617, -4.151258617), (70.937553432, -2.977165271))
            ThreePointArc((70.937553432, -2.977165271), (70.908872009, 3.596090987), (70.272400971, 10.138523645))
        make_face(mode=Mode.SUBTRACT)
        with BuildLine():
            Line((66.79305099, 24.076717789), (93.133972507, 33.571761424))
            ThreePointArc((93.133972507, 33.571761424), (95.839634768, 24.814600694), (97.723815414, 15.844743637))
            Line((97.723815414, 15.844743637), (70.084756509, 11.363402002))
            ThreePointArc((70.084756509, 11.363402002), (68.733475439, 17.79632979), (66.79305099, 24.076717789))
        make_face(mode=Mode.SUBTRACT)
        with BuildLine():
            Line((60.579185652, 37.029208278), (84.469568727, 51.632276331))
            ThreePointArc((84.469568727, 51.632276331), (88.882649417, 43.599021004), (92.533879726, 35.192060224))
            Line((92.533879726, 35.192060224), (66.36268142, 25.238750261))
            ThreePointArc((66.36268142, 25.238750261), (63.74412231, 31.267984761), (60.579185652, 37.029208278))
        make_face(mode=Mode.SUBTRACT)
        with BuildLine():
            ThreePointArc((40.049966957, 58.62593408), (34.45643934, 62.078609746), (28.567571162, 64.999183671))
            Line((28.567571162, 64.999183671), (39.833655564, 90.632664555))
            ThreePointArc((39.833655564, 90.632664555), (48.044894291, 86.560314998), (55.844320123, 81.746020759))
            Line((55.844320123, 81.746020759), (40.049966957, 58.62593408))
        make_face(mode=Mode.SUBTRACT)
        with BuildLine():
            ThreePointArc((13.684749624, 69.668699053), (7.182950861, 70.635721961), (0.61958402, 70.997296538))
            Line((0.61958402, 70.997296538), (0.863927014, 98.996230383))
            ThreePointArc((0.863927014, 98.996230383), (10.015663877, 98.492063016), (19.081552293, 97.143678961))
            Line((19.081552293, 97.143678961), (13.684749624, 69.668699053))
        make_face(mode=Mode.SUBTRACT)
        with BuildLine():
            ThreePointArc((27.428828011, 65.487856843), (21.254781731, 67.743887204), (14.898551822, 69.41925636))
            Line((14.898551822, 69.41925636), (20.774037048, 96.795864502))
            ThreePointArc((20.774037048, 96.795864502), (29.636949174, 94.459786384), (38.245830607, 91.314053908))
            Line((38.245830607, 91.314053908), (27.428828011, 65.487856843))
        make_face(mode=Mode.SUBTRACT)
        with BuildLine():
            Line((51.885201337, 48.465718629), (72.346970878, 67.578959779))
            ThreePointArc((72.346970878, 67.578959779), (78.286797957, 60.598492272), (83.55559613, 53.09860973))
            Line((83.55559613, 53.09860973), (59.923710356, 38.08082112))
            ThreePointArc((59.923710356, 38.08082112), (56.145077323, 43.459524761), (51.885201337, 48.465718629))
        make_face(mode=Mode.SUBTRACT)
        with BuildLine():
            Line((41.067030782, 57.918036765), (57.262479541, 80.758952673))
            ThreePointArc((57.262479541, 80.758952673), (64.485875789, 75.117054147), (71.156536611, 68.831295916))
            Line((71.156536611, 68.831295916), (51.03145555, 49.363858687))
            ThreePointArc((51.03145555, 49.363858687), (46.247446273, 53.871826711), (41.067030782, 57.918036765))
        make_face(mode=Mode.SUBTRACT)
    extrude(amount=RESSALTO_EXTRUS_O1_DEPTH)

    # Esboço2 → Corte-extrusão1 (cut, through all)
    with BuildSketch(Plane(origin=(0, 15, 0), x_dir=(1, 0, 0), z_dir=(0, 1, 0))):
        Polygon((-6.686906976, -68.804808982), (-10.066215223, -105.188102797), (14.625368553, -107.481476044), (8.701602716, -67.10533658), align=None)
    extrude(amount=-CORTE_EXTRUS_O1_DEPTH, mode=Mode.SUBTRACT)


solid = part.part
